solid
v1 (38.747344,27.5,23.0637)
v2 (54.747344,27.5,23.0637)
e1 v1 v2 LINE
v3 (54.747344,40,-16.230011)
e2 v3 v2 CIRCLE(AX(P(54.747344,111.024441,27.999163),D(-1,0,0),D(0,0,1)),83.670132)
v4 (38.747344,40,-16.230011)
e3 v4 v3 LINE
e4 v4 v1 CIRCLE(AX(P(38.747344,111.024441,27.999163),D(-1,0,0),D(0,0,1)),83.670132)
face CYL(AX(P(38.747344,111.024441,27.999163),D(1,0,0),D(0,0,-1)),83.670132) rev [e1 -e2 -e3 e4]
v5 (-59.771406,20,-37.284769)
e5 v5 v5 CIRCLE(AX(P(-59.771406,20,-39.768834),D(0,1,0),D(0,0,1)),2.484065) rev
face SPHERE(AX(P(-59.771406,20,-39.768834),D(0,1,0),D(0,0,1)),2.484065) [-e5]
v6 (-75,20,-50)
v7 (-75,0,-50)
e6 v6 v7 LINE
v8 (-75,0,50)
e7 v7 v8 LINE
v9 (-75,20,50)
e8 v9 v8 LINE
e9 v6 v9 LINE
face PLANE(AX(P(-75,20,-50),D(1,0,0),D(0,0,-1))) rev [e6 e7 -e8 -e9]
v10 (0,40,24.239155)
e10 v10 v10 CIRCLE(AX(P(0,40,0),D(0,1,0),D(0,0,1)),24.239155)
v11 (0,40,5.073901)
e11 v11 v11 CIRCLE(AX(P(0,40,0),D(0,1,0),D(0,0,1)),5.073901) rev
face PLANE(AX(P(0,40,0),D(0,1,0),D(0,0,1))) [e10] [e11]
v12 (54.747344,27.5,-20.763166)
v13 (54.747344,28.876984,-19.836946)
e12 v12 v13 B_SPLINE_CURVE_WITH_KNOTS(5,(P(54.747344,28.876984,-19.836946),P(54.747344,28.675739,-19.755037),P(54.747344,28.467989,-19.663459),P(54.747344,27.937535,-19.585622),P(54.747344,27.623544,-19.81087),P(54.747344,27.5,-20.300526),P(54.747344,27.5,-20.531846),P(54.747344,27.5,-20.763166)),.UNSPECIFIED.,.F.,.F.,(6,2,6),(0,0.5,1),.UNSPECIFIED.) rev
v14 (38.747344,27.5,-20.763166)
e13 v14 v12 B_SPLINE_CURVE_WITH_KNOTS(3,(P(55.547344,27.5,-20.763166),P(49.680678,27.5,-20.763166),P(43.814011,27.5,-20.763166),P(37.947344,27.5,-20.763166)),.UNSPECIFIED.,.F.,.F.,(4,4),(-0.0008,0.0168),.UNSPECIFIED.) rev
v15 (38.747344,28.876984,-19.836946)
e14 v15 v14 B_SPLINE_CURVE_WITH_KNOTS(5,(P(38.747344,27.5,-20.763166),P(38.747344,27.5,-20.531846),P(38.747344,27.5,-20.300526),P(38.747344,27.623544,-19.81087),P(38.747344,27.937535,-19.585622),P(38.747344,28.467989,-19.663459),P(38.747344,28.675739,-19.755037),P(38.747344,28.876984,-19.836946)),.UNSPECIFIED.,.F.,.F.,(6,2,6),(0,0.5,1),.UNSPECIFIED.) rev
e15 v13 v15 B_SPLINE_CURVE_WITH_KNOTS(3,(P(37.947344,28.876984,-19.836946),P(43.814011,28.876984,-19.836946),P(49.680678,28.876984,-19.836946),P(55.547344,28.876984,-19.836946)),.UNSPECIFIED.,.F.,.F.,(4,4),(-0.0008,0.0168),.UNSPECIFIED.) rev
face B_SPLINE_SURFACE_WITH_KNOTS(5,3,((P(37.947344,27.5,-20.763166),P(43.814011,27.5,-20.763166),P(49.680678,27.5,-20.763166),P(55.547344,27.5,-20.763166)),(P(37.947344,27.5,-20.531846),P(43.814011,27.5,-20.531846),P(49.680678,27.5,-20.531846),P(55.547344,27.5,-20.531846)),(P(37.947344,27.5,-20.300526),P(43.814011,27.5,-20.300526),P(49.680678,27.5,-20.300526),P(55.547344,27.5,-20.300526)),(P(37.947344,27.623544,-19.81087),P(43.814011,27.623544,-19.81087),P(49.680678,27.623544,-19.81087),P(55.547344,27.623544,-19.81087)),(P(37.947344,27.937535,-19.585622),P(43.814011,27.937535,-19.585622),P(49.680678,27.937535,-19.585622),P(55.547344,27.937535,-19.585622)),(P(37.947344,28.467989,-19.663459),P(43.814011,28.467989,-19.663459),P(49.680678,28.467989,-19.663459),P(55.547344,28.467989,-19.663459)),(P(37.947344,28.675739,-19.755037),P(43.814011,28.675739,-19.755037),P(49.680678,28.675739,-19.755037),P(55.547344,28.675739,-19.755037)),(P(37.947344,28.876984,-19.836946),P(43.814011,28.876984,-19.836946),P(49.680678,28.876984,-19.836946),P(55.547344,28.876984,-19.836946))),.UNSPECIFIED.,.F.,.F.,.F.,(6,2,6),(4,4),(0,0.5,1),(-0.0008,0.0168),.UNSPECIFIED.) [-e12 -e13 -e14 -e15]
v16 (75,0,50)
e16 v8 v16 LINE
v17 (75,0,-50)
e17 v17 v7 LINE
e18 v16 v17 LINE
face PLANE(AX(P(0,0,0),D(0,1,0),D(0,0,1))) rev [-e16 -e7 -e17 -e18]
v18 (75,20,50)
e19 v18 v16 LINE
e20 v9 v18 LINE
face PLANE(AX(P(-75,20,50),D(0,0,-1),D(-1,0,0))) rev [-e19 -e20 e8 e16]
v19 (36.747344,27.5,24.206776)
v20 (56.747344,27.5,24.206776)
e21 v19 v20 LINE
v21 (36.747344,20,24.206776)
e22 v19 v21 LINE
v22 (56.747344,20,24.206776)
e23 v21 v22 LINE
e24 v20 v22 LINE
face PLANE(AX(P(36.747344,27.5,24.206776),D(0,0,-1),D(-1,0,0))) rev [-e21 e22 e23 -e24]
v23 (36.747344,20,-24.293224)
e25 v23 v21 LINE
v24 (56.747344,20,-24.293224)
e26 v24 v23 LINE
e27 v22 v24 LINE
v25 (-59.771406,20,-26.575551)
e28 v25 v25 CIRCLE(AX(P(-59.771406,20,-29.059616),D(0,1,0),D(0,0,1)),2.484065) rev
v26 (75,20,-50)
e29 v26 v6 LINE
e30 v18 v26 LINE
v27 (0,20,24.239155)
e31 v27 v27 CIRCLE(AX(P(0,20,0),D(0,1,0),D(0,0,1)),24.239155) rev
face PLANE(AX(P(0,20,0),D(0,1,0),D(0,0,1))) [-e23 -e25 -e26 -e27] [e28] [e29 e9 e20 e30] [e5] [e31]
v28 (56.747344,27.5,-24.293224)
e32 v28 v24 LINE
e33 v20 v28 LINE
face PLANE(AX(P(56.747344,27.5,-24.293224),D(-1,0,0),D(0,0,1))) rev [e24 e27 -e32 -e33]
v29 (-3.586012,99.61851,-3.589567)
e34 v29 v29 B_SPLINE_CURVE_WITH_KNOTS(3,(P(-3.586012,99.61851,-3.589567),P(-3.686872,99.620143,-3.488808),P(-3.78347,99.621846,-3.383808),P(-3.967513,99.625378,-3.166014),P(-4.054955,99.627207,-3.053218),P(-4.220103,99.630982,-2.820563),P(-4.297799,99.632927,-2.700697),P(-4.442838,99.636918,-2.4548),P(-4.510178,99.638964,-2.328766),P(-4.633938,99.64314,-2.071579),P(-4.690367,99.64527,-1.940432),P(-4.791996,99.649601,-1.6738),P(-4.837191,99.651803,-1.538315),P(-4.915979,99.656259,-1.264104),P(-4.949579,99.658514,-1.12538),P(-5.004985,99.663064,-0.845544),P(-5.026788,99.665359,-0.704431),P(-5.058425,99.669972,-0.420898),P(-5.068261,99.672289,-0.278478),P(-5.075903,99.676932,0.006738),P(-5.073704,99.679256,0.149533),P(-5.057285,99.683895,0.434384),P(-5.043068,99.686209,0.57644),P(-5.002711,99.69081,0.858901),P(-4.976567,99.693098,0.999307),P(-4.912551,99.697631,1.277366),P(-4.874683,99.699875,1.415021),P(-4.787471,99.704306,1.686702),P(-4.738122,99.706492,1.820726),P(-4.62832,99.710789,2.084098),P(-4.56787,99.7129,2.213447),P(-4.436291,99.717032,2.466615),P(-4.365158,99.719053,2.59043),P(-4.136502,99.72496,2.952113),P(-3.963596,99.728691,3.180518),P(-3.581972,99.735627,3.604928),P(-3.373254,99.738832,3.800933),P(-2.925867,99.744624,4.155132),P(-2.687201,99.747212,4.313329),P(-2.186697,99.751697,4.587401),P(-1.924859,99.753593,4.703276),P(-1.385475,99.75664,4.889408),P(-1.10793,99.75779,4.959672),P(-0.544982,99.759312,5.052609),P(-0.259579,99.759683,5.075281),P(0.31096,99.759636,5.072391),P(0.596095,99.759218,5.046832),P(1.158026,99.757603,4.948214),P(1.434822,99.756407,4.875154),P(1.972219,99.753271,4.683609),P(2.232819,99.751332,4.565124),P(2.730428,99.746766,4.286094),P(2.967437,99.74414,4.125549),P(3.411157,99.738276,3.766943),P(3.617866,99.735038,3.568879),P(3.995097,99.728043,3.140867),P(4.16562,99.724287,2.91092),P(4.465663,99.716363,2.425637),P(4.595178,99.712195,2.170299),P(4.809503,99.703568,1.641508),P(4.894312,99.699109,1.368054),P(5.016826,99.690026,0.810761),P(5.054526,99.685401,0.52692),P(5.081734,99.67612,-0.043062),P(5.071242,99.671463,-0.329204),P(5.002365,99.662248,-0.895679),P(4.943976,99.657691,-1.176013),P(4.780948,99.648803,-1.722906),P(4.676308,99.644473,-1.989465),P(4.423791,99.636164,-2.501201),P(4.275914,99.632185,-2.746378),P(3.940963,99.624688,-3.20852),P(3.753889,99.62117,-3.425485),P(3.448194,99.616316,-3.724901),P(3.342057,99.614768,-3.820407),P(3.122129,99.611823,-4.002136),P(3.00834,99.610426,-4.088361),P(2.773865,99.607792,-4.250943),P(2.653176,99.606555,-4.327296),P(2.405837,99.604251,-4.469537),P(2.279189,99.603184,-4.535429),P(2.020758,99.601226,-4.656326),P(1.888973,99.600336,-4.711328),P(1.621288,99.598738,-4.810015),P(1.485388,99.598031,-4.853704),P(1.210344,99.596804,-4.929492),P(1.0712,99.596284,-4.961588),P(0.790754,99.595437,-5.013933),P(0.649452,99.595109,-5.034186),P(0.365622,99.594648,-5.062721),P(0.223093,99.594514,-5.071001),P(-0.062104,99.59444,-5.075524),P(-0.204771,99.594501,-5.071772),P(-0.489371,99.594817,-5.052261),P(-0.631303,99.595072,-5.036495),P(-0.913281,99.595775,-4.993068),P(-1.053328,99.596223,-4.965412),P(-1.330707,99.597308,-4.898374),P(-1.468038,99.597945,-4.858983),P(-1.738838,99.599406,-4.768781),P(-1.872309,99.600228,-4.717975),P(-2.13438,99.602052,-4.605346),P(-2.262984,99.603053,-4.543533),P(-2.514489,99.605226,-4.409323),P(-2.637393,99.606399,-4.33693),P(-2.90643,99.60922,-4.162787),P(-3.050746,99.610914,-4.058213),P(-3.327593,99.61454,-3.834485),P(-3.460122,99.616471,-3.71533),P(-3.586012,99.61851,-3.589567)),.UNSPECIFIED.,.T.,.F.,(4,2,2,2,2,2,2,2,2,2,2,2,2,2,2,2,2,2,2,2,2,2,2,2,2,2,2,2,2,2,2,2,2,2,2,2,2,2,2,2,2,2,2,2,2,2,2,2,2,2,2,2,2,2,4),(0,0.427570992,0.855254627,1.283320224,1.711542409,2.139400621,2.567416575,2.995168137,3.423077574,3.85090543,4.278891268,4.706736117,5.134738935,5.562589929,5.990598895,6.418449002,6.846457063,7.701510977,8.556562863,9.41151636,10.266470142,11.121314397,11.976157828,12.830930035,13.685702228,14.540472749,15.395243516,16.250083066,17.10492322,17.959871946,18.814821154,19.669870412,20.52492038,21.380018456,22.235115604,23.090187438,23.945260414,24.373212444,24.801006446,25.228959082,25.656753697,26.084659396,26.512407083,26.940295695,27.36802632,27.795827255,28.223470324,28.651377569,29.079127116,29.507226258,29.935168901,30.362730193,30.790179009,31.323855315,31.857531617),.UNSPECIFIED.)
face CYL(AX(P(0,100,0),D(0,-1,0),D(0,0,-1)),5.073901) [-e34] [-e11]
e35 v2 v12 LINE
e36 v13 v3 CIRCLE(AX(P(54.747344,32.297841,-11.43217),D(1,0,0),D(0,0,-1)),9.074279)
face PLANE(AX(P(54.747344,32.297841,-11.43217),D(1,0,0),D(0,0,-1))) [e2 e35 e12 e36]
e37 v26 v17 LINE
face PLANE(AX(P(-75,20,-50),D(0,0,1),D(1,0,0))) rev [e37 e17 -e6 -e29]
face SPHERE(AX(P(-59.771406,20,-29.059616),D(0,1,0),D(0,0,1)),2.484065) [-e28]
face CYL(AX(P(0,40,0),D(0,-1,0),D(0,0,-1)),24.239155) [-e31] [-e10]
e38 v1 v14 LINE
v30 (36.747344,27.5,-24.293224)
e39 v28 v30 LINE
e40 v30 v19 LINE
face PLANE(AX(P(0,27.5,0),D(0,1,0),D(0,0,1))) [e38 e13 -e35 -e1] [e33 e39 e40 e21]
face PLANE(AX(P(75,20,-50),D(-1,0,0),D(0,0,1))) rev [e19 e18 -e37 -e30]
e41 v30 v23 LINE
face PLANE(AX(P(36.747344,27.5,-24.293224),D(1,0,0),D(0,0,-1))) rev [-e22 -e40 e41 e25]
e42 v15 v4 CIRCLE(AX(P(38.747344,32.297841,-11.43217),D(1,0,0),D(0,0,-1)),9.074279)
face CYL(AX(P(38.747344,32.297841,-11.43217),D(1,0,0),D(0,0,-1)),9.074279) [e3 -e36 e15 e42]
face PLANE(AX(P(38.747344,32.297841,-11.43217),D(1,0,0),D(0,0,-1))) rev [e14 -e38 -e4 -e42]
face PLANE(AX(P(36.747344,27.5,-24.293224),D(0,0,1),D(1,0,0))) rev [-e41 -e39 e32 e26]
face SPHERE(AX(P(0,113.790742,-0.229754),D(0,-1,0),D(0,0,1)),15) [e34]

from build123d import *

# Parameters (mm, degrees)
SKETCH1_W            = 150
SKETCH1_H            = 100
BOSS_EXTRUDE1_DEPTH  = 20
SKETCH2_R            = 24.239154651
BOSS_EXTRUDE2_DEPTH  = 40
SKETCH3_R            = 5.073901121
BOSS_EXTRUDE3_DEPTH  = 100
SKETCH17_W           = 20
SKETCH17_H           = 48.5
BOSS_EXTRUDE14_DEPTH = 7.5
BOSS_EXTRUDE15_START = -2
BOSS_EXTRUDE15_DEPTH = 16
FILLET5_START        = 38.747344483
FILLET5_DEPTH        = 16


with BuildPart() as part:
    # Sketch1 → Boss-Extrude1 (new body)
    with BuildSketch(Plane(origin=(0, 0, 0), x_dir=(1, 0, 0), z_dir=(0, 1, 0))):
        Rectangle(SKETCH1_W, SKETCH1_H)
    extrude(amount=BOSS_EXTRUDE1_DEPTH)

    # Sketch2 → Boss-Extrude2 (add)
    with BuildSketch(Plane(origin=(0, 0, 0), x_dir=(1, 0, 0), z_dir=(0, 1, 0))):
        with Locations(Location((0, 0, 0), (0, 0, 270))):
            Circle(SKETCH2_R)
    extrude(amount=BOSS_EXTRUDE2_DEPTH)

    # Sketch3 → Boss-Extrude3 (add)
    with BuildSketch(Plane(origin=(0, 0, 0), x_dir=(1, 0, 0), z_dir=(0, 1, 0))):
        with Locations(Location((0, 0, 0), (0, 0, 90))):
            Circle(SKETCH3_R)
    extrude(amount=BOSS_EXTRUDE3_DEPTH)

    # Sketch5 → Revolve2 (revolve)
    with BuildSketch(Plane(origin=(0, 0, 0), x_dir=(0, 0, -1), z_dir=(1, 0, 0))):
        with BuildLine():
            Line((0.229753848, 98.790742156), (0.229753848, 128.790742156))
            ThreePointArc((0.229753848, 128.790742156), (-14.770246152, 113.790742156), (0.229753848, 98.790742156))
        make_face()
    revolve(axis=Axis((0, 98.790742156, -0.229753848), (0, 1, 0)))

    # Sketch17 → Boss-Extrude14 (add)
    with BuildSketch(Plane(origin=(0, 20, 0), x_dir=(1, 0, 0), z_dir=(0, 1, 0))):
        with Locations((46.747344483, 0.04322355)):
            Rectangle(SKETCH17_W, SKETCH17_H)
    extrude(amount=BOSS_EXTRUDE14_DEPTH)

    # Sketch21 → Boss-Extrude15 (add)
    with BuildSketch(Plane(origin=(56.747344483, 0, 0), x_dir=(0, 0, -1), z_dir=(1, 0, 0)).offset(BOSS_EXTRUDE15_START)):
        with BuildLine():
            Line((19.134328626, 27.5), (-23.063699683, 27.5))
            ThreePointArc((-23.063699683, 27.5), (-2.634761018, 31.291523365), (16.230010888, 40))
            ThreePointArc((16.230010888, 40), (20.271004522, 34.351503898), (19.134328626, 27.5))
        make_face()
    extrude(amount=-BOSS_EXTRUDE15_DEPTH)

    # Fillet5: read off the stored shape, not the designer's step
    # Fillet5 outline → Fillet5 (add)
    with BuildSketch(Plane.YZ.offset(FILLET5_START)):
        with BuildLine():
            Line((27.5, -19.134328626), (27.5, -20.763165982))
            add(Edge.make_bspline(
                [(27.5, -20.763165982), (27.5, -20.531845888), (27.5, -20.300525794), (27.623544112, -19.810870378), (27.937534857, -19.585621938), (28.467988806, -19.663458549), (28.675738966, -19.755036772), (28.876983932, -19.836946184)],
                knots=[0, 0, 0, 0, 0, 0, 0.5, 0.5, 1, 1, 1, 1, 1, 1], degree=5))
            ThreePointArc((28.876983932, -19.836946184), (28.173502588, -19.515013461), (27.5, -19.134328626))
        make_face()
    extrude(amount=FILLET5_DEPTH)

    # Sketch24 → Revolve3 (revolve)
    with BuildSketch(Plane(origin=(0, 20, 0), x_dir=(1, 0, 0), z_dir=(0, 1, 0))):
        with BuildLine():
            Line((-62.255471135, 39.768833527), (-57.287341541, 39.768833527))
            ThreePointArc((-57.287341541, 39.768833527), (-59.771406338, 42.252898324), (-62.255471135, 39.768833527))
        make_face()
    revolve(axis=Axis((-62.255471135, 20, -39.768833527), (1, 0, 0)))

    # Sketch25 → Revolve4 (revolve)
    with BuildSketch(Plane(origin=(0, 20, 0), x_dir=(1, 0, 0), z_dir=(0, 1, 0))):
        with BuildLine():
            Line((-62.255471135, 29.059615512), (-57.287341541, 29.059615512))
            ThreePointArc((-57.287341541, 29.059615512), (-59.771406338, 31.543680309), (-62.255471135, 29.059615512))
        make_face()
    revolve(axis=Axis((-62.255471135, 20, -29.059615512), (1, 0, 0)))


solid = part.part
